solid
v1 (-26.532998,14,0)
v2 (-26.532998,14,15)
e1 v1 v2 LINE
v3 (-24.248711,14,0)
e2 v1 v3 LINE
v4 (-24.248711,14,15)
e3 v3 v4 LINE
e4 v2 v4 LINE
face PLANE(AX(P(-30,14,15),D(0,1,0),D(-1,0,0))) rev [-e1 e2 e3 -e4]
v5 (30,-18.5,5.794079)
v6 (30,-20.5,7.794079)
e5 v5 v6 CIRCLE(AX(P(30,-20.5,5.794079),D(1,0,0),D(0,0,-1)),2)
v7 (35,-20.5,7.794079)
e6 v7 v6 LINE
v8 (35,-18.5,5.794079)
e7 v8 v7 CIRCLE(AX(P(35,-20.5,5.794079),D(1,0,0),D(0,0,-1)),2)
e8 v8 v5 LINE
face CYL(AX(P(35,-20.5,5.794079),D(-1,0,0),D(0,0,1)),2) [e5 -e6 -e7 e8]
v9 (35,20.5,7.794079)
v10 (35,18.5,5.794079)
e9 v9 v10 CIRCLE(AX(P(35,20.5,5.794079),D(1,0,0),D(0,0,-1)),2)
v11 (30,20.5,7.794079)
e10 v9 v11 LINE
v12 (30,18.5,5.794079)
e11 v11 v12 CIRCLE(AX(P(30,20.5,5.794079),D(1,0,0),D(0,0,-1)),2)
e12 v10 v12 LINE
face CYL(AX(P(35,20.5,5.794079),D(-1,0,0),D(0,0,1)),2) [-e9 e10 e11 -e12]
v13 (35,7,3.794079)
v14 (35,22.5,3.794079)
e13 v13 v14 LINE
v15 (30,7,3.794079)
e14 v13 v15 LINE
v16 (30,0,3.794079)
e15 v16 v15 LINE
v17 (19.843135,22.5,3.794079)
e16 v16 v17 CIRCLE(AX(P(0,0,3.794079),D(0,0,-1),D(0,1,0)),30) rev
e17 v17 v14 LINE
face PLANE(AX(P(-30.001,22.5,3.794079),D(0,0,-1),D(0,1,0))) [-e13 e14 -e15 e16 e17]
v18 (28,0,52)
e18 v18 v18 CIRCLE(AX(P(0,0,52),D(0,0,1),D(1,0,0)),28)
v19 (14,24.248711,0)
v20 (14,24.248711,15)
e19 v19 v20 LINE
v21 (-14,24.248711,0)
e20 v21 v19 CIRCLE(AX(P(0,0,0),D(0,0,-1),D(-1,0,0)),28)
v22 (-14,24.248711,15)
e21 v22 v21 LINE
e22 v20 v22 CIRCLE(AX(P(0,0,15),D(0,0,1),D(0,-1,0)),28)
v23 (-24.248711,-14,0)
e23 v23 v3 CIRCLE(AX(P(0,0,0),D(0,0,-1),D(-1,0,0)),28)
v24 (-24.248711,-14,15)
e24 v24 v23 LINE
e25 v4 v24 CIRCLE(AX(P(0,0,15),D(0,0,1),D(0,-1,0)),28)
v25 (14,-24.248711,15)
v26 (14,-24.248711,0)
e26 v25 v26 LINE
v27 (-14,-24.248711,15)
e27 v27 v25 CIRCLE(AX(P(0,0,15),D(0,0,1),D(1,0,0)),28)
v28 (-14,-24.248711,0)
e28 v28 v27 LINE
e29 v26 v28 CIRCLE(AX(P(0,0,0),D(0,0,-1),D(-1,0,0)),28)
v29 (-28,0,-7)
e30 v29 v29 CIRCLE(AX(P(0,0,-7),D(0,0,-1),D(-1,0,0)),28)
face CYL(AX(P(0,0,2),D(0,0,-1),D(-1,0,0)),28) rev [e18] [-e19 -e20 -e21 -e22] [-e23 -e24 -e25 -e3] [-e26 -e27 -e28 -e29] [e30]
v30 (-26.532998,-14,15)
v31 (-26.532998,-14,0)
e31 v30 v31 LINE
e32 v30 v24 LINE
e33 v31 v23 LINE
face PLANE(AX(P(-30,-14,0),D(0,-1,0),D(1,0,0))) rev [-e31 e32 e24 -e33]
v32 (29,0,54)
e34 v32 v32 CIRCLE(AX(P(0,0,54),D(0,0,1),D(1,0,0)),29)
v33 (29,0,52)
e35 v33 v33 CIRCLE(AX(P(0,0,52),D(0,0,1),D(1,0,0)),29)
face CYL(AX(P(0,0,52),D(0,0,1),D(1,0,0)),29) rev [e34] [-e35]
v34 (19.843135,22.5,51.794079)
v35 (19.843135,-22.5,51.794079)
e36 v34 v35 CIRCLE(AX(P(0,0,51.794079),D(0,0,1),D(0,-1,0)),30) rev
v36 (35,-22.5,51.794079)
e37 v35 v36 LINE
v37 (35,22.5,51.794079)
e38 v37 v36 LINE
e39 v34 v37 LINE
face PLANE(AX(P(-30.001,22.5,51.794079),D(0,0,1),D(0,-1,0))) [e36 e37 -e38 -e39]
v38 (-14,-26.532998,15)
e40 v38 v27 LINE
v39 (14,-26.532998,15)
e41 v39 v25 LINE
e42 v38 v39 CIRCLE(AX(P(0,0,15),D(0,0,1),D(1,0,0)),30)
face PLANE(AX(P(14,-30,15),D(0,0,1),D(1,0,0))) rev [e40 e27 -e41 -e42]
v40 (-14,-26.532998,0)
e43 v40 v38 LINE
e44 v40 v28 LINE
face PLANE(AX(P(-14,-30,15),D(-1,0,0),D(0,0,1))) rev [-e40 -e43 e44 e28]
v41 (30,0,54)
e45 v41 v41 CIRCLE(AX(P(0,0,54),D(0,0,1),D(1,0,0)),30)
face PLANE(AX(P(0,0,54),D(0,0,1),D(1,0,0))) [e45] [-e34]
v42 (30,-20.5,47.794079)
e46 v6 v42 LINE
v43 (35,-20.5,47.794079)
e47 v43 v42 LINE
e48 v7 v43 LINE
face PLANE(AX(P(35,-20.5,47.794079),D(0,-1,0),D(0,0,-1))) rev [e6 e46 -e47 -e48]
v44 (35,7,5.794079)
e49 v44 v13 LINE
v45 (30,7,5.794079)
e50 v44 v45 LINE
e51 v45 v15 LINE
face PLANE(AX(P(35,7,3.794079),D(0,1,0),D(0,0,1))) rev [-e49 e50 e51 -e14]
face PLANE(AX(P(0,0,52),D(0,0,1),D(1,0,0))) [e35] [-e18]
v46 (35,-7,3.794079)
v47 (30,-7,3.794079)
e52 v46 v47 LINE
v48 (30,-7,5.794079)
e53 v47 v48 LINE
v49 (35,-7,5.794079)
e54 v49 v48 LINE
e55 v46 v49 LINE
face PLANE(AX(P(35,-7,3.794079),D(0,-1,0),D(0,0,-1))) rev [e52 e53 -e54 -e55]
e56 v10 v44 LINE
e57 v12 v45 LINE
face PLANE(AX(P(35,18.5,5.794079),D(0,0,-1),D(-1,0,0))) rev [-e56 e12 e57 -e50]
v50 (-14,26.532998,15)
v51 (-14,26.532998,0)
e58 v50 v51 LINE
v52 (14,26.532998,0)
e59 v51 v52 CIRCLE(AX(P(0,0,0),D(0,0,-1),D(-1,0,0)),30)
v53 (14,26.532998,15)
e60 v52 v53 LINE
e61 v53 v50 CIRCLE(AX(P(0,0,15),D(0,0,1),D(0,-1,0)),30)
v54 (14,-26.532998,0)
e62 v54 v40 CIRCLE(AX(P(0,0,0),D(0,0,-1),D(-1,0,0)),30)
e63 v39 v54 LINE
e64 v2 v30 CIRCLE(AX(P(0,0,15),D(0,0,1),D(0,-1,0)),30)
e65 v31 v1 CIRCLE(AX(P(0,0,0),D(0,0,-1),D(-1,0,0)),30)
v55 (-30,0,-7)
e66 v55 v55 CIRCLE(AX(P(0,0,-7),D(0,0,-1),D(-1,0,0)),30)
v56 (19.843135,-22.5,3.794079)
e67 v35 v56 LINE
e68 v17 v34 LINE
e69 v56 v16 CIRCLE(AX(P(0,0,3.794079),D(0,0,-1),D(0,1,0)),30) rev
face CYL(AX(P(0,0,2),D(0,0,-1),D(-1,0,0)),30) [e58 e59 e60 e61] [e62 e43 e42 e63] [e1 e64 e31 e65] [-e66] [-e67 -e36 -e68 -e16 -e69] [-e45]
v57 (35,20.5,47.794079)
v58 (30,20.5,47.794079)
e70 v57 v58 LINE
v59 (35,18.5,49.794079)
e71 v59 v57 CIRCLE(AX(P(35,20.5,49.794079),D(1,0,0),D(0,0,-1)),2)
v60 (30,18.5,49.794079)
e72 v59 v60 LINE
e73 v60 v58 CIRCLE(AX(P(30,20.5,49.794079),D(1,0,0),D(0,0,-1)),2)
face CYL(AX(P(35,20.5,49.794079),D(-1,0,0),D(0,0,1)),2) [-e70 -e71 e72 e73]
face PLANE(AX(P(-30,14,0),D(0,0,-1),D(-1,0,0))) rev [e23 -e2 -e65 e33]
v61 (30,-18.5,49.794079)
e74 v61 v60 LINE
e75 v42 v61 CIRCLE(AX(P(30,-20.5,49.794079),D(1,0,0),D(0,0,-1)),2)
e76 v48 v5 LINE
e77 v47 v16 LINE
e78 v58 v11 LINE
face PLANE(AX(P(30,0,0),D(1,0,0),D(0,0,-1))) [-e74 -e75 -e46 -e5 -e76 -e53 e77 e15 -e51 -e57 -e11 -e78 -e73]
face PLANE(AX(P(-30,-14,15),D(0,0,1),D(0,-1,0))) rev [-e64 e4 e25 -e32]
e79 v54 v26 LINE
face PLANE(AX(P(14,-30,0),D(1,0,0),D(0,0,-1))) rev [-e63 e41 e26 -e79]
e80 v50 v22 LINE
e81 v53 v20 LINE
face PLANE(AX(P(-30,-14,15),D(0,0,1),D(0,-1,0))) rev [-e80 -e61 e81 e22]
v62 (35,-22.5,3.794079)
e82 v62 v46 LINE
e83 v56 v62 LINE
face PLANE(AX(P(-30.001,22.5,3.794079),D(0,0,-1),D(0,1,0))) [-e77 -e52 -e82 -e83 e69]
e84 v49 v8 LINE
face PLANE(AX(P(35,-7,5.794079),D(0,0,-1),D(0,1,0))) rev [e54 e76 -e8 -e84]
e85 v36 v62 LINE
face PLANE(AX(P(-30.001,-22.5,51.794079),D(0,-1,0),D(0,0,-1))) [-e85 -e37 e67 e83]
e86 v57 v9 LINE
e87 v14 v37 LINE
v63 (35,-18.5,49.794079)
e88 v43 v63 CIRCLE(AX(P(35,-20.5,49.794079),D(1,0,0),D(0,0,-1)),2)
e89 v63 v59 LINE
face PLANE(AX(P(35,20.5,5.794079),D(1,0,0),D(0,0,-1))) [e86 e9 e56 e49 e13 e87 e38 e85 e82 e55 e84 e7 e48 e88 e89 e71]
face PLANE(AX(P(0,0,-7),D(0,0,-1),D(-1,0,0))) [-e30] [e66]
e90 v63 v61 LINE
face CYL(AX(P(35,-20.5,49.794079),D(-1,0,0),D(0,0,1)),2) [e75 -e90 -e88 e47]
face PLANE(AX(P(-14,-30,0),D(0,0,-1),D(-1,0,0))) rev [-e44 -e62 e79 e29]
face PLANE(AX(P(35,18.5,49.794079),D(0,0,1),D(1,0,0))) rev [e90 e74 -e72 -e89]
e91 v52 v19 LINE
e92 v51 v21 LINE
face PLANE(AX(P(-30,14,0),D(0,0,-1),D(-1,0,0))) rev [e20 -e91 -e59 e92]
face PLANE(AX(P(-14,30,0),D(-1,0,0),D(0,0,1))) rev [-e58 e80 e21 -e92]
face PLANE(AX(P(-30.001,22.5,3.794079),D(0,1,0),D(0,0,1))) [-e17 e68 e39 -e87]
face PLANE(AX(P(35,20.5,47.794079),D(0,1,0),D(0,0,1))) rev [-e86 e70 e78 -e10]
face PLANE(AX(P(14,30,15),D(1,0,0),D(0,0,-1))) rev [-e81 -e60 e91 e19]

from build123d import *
from build123d.topology import SkipClean

# Parameters (mm, degrees)
SKETCH_1_R               = 30
SKETCH_1_R_2             = 28
EXTRUDE_1_DEPTH          = 2
SKETCH_2_R               = 30
SKETCH_2_R_2             = 28
EXTRUDE_2_DEPTH          = 52
CUT_EXTRUDE_START        = -2
SKETCH_6_R               = 29
SKETCH_6_R_2             = 28
CUT_EXTRUDE_2_DEPTH      = 2
EXTRUDE_START            = 7
SKETCH_7_R               = 30
SKETCH_7_R_2             = 28
EXTRUDE_3_DEPTH          = 7
EXTRUDE_7_REACH          = 88.116
EXTRUDE_7_END_RADIUS     = 30
SKETCH_8_W               = 48
SKETCH_8_H               = 45
SKETCH_9_W               = 28
SKETCH_9_H               = 15
CUT_EXTRUDE_3_DEPTH      = 69.673138854
PATTERN_CIRCULAR_2_COUNT = 3
PATTERN_CIRCULAR_2_ANGLE = 180
EXTRUDE_8_DEPTH          = 5


with BuildPart() as part:
    # 草图1 → 凸台-拉伸1 (new body)
    with BuildSketch(Plane.XY):
        Circle(SKETCH_1_R)
        Circle(SKETCH_1_R_2, mode=Mode.SUBTRACT)
    extrude(amount=EXTRUDE_1_DEPTH)

    # 草图2 → 凸台-拉伸2 (add)
    with BuildSketch(Plane.XY.offset(2)):
        Circle(SKETCH_2_R)
        Circle(SKETCH_2_R_2, mode=Mode.SUBTRACT)
    extrude(amount=EXTRUDE_2_DEPTH)

    # 草图6 → 切除-拉伸2 (cut)
    with BuildSketch(Plane.XY.offset(54).offset(CUT_EXTRUDE_START)):
        Circle(SKETCH_6_R)
        Circle(SKETCH_6_R_2, mode=Mode.SUBTRACT)
    extrude(amount=CUT_EXTRUDE_2_DEPTH, mode=Mode.SUBTRACT)

    # 草图7 → 凸台-拉伸3 (add)
    with SkipClean():  # the faces are left unmerged after this step: merging them gives an invalid solid
        with BuildSketch(Plane(origin=(0, 0, 0), x_dir=(-1, 0, 0), z_dir=(0, 0, -1)).offset(EXTRUDE_START)):
            Circle(SKETCH_7_R)
            Circle(SKETCH_7_R_2, mode=Mode.SUBTRACT)
        extrude(amount=-EXTRUDE_3_DEPTH)

    # 凸台-拉伸7: up to this cylinder (the profile starts outside it)
    with SkipClean():  # the faces are left unmerged after this step: merging them gives an invalid solid
        extrude_7_end = Plane(origin=(0, 0, 27.794079), z_dir=(0, 0, -1)) * Cylinder(EXTRUDE_7_END_RADIUS, 237.232, mode=Mode.PRIVATE)
        # 草图8 → 凸台-拉伸7 (add, up to the surface)
        with BuildSketch(Plane(origin=(30, 0, 0), x_dir=(0, 0, -1), z_dir=(1, 0, 0)), mode=Mode.PRIVATE) as extrude_7_sk1:
            with Locations((-27.794078809, 0)):
                Rectangle(SKETCH_8_W, SKETCH_8_H)
        extrude_7_tool1 = extrude(extrude_7_sk1.sketch, amount=-EXTRUDE_7_REACH, mode=Mode.PRIVATE) - extrude_7_end
        add(extrude_7_tool1.solids().sort_by_distance((30, 0, 27.794079))[0])
        add(extrude_7_tool1.solids().sort_by_distance((30, 0, 27.794079))[1])

    # 草图9 → 切除-拉伸3 (cut, through all)
    with SkipClean():  # the faces are left unmerged after this step: merging them gives an invalid solid
        with BuildSketch(Plane(origin=(0, 0, 0), x_dir=(1, 0, 0), z_dir=(0, 1, 0))):
            with Locations((0, -7.5)):
                Rectangle(SKETCH_9_W, SKETCH_9_H)
        cut_extrude_3 = extrude(amount=-CUT_EXTRUDE_3_DEPTH, mode=Mode.SUBTRACT)

    # 阵列(圆周)2: 切除-拉伸3 ×3 about axis
    with SkipClean():  # the faces are left unmerged after this step: merging them gives an invalid solid
        pattern_circular_2_axis = Axis((0, 0, 0), (0, 0, -1))
        for i in range(1, PATTERN_CIRCULAR_2_COUNT):
            add(cut_extrude_3.rotate(pattern_circular_2_axis, i * PATTERN_CIRCULAR_2_ANGLE / (PATTERN_CIRCULAR_2_COUNT - 1)), mode=Mode.SUBTRACT)

    # 草图10 → 凸台-拉伸8 (add)
    with SkipClean():  # the faces are left unmerged after this step: merging them gives an invalid solid
        with BuildSketch(Plane(origin=(30, 0, 0), x_dir=(0, 0, -1), z_dir=(1, 0, 0))):
            with BuildLine():
                Line((-3.794078809, 22.5), (-3.794078809, 7))
                Line((-3.794078809, 7), (-5.794078809, 7))
                Line((-5.794078809, 7), (-5.794078809, 18.5))
                ThreePointArc((-5.794078809, 18.5), (-7.208292371, 19.085786438), (-7.794078809, 20.5))
                Line((-7.794078809, 20.5), (-47.794078809, 20.5))
                ThreePointArc((-47.794078809, 20.5), (-48.379865247, 19.085786438), (-49.794078809, 18.5))
                Line((-49.794078809, 18.5), (-49.794078809, -18.5))
                ThreePointArc((-49.794078809, -18.5), (-48.379865247, -19.085786438), (-47.794078809, -20.5))
                Line((-47.794078809, -20.5), (-7.794078809, -20.5))
                ThreePointArc((-7.794078809, -20.5), (-7.208292371, -19.085786438), (-5.794078809, -18.5))
                Line((-5.794078809, -18.5), (-5.794078809, -7))
                Line((-5.794078809, -7), (-3.794078809, -7))
                Line((-3.794078809, -7), (-3.794078809, -22.5))
                Line((-3.794078809, -22.5), (-51.794078809, -22.5))
                Line((-51.794078809, -22.5), (-51.794078809, 22.5))
                Line((-51.794078809, 22.5), (-3.794078809, 22.5))
            make_face()
        extrude(amount=EXTRUDE_8_DEPTH)


solid = part.part
